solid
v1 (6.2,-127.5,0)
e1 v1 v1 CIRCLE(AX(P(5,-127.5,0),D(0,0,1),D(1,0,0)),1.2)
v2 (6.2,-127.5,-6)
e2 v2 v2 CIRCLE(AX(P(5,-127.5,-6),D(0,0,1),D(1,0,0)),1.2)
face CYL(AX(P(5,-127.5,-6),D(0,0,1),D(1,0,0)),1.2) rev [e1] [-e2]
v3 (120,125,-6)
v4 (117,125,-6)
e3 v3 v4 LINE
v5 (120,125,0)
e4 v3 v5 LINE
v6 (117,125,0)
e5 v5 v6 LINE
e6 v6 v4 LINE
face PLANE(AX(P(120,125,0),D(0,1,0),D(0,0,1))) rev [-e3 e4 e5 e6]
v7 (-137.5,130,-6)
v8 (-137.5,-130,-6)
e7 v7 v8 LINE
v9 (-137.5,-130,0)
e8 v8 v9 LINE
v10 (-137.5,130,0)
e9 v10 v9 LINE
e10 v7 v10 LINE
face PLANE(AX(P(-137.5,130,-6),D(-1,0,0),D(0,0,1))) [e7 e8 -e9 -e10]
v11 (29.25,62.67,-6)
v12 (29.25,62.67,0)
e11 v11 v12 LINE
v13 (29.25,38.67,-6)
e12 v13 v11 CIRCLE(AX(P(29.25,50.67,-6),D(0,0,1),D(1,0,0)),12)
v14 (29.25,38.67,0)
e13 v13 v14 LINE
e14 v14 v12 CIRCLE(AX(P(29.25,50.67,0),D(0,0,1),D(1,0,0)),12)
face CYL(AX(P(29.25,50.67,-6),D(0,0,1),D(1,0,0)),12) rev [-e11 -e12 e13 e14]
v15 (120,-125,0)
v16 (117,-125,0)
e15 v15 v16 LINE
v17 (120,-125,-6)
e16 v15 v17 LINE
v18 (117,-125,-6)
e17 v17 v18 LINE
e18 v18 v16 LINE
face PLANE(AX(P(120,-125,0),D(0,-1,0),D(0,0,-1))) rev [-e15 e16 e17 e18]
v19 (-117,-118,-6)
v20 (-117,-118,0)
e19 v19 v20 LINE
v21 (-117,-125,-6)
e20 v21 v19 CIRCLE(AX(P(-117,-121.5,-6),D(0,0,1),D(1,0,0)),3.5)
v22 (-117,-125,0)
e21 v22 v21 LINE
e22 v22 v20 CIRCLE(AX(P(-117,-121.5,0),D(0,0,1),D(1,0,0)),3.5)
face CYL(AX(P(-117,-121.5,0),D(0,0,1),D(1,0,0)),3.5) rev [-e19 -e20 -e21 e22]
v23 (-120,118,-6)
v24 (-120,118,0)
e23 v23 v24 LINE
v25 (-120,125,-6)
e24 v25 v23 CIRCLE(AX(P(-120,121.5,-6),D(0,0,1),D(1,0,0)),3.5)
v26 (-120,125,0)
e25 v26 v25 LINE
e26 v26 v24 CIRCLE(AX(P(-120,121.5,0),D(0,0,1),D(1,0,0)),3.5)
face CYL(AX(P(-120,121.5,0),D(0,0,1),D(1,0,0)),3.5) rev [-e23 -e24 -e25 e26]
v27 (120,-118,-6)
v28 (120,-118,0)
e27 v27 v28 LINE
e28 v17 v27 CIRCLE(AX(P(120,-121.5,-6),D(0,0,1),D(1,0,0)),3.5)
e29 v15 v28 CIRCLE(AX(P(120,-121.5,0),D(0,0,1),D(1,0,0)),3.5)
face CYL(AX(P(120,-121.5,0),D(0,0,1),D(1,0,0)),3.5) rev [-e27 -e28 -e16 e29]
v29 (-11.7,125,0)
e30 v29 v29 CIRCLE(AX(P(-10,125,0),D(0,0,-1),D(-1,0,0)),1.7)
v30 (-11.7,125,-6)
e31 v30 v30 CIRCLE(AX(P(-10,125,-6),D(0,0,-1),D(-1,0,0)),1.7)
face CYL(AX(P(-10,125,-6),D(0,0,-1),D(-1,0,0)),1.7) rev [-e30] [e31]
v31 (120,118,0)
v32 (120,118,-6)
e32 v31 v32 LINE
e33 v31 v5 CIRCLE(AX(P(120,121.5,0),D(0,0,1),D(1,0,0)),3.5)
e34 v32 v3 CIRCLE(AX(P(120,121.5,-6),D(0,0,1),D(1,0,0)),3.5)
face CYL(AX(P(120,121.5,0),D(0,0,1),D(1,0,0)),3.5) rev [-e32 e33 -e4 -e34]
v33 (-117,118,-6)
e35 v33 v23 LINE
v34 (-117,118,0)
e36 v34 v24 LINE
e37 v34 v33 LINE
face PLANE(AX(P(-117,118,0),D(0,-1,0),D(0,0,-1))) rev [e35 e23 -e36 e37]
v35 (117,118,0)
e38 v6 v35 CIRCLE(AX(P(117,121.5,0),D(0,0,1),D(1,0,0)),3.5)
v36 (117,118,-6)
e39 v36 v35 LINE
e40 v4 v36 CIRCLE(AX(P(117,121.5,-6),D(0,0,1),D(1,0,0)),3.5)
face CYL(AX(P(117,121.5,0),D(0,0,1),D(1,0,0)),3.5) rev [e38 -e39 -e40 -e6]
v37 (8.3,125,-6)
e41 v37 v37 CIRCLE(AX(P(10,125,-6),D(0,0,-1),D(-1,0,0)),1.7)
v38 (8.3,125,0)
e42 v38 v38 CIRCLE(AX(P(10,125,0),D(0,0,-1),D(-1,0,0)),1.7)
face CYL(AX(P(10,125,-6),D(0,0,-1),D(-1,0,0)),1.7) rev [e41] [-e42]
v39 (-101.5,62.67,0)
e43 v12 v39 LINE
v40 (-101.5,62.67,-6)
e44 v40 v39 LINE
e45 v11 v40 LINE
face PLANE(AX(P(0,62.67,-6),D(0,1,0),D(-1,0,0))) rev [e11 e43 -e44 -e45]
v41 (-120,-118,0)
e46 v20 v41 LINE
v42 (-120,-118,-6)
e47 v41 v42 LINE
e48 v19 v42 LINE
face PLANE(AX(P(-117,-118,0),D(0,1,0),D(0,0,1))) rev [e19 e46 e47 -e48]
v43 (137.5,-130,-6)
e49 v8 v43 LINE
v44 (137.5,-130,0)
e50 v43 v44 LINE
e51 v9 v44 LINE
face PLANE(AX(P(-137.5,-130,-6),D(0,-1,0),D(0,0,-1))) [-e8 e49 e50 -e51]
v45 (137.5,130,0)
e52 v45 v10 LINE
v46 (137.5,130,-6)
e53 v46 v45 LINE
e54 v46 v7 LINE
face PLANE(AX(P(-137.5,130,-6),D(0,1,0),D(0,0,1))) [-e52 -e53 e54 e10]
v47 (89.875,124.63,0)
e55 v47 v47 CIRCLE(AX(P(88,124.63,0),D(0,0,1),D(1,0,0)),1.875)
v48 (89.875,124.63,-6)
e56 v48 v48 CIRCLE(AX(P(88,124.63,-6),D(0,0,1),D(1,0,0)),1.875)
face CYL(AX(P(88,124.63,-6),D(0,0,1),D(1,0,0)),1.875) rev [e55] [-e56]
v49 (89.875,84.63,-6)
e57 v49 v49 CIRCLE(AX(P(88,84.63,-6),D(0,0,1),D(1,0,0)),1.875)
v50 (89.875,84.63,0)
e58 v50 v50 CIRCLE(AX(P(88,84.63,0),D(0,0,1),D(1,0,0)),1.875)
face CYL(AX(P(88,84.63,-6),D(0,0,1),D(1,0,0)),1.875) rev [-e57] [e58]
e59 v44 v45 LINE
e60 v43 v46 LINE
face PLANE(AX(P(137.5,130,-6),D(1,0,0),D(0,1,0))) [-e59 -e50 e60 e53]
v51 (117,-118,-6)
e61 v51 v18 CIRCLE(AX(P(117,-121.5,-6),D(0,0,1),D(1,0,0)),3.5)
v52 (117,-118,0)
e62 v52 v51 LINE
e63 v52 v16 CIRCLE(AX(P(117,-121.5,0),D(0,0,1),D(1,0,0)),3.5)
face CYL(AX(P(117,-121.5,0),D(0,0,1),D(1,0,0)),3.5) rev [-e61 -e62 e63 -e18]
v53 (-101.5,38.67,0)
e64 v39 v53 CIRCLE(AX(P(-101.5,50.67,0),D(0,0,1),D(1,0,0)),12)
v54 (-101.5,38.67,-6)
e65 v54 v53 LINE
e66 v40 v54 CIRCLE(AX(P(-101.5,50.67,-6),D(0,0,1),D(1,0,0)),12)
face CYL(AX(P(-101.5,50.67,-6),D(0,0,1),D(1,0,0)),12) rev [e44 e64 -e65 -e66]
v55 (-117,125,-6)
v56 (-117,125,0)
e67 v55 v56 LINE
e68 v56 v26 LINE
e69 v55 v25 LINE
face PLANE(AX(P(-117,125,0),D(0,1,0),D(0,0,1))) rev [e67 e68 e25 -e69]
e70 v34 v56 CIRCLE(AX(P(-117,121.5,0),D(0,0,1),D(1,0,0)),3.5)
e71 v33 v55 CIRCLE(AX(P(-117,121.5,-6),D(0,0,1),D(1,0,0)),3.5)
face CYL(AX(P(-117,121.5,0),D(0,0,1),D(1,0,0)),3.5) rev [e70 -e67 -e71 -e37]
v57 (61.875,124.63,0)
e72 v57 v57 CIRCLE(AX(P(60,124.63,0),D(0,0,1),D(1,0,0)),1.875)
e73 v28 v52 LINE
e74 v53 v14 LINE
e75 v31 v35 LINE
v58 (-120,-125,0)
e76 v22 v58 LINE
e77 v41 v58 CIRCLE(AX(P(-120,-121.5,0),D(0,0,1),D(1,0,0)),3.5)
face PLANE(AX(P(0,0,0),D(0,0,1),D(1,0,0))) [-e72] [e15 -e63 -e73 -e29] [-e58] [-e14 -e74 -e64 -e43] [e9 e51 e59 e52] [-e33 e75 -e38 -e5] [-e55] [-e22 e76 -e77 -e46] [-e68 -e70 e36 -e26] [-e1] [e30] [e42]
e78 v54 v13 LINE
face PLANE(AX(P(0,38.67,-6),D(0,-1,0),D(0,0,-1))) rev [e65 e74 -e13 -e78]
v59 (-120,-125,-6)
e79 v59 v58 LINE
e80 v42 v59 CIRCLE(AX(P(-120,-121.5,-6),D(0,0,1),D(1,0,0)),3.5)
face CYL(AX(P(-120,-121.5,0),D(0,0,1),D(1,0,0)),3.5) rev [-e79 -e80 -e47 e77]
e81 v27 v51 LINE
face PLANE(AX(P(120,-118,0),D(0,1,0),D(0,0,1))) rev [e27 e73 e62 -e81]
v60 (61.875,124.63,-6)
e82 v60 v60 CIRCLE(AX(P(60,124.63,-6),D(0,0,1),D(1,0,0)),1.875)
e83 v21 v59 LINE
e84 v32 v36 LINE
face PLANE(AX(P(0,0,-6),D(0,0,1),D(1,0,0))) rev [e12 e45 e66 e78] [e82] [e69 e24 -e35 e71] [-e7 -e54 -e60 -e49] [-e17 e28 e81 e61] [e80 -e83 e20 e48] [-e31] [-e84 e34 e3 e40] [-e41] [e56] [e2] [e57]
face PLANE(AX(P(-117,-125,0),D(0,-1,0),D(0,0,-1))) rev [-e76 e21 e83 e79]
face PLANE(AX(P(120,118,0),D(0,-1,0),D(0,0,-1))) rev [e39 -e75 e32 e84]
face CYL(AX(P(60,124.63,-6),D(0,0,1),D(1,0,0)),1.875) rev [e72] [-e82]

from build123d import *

# Parameters (mm, degrees)
CROQUIS1_W                      = 275
CROQUIS1_H                      = 260
BRIDA_BASE1_DEPTH               = 6
CORTAR_EXTRUIR1_DEPTH           = 190.320495457
CORTAR_EXTRUIR2_DEPTH           = 190.320495457
CORTAR_EXTRUIR2_DEPTH_BACK      = 190.320495457
CROQUIS3_R                      = 1.875
RANURA_START                    = -6
RANURA_DE_MARGEN_PARA_M61_DEPTH = 6
CROQUIS8_R                      = 1.2
CORTAR_EXTRUIR4_DEPTH           = 190.320495457
TALADRO_DE_MARGEN_PARA_M31_D    = 3.4


# Read off the part's stored shape, not the designer's step: Ranura de margen para M61
# Sheet-metal steps are written as plain solids
with BuildPart() as part:
    # Croquis1 → Brida base1 (new body)
    with BuildSketch(Plane.XY):
        Rectangle(CROQUIS1_W, CROQUIS1_H)
    extrude(amount=-BRIDA_BASE1_DEPTH)

    # Croquis2 → Cortar-Extruir1 (cut, through all)
    with BuildSketch(Plane.XY):
        with BuildLine():
            Line((-101.5, 38.67), (29.25, 38.67))
            ThreePointArc((29.25, 38.67), (41.25, 50.67), (29.25, 62.67))
            Line((29.25, 62.67), (-101.5, 62.67))
            ThreePointArc((-101.5, 62.67), (-113.5, 50.67), (-101.5, 38.67))
        make_face()
    extrude(amount=-CORTAR_EXTRUIR1_DEPTH, mode=Mode.SUBTRACT)

    # Croquis3 → Cortar-Extruir2 (cut, two sides: drawn at the far end of the back side and taken through both)
    with BuildSketch(Plane.XY.offset(-CORTAR_EXTRUIR2_DEPTH_BACK)):
        with Locations((88, 84.63)):
            Circle(CROQUIS3_R)
        with Locations((88, 124.63)):
            Circle(CROQUIS3_R)
        with Locations((60, 124.63)):
            Circle(CROQUIS3_R)
    extrude(amount=CORTAR_EXTRUIR2_DEPTH + CORTAR_EXTRUIR2_DEPTH_BACK, mode=Mode.SUBTRACT)

    # Ranura de margen para M61 outline → Ranura de margen para M61 (cut)
    with BuildSketch(Plane.XY.offset(RANURA_START)):
        with BuildLine():
            Line((120, 125), (117, 125))
            ThreePointArc((117, 125), (113.5, 121.5), (117, 118))
            Line((117, 118), (120, 118))
            ThreePointArc((120, 118), (123.5, 121.5), (120, 125))
        make_face()
        with BuildLine():
            ThreePointArc((-120, 125), (-123.5, 121.5), (-120, 118))
            Line((-120, 118), (-117, 118))
            ThreePointArc((-117, 118), (-113.5, 121.5), (-117, 125))
            Line((-117, 125), (-120, 125))
        make_face()
        with BuildLine():
            Line((-117, -118), (-120, -118))
            ThreePointArc((-120, -118), (-123.5, -121.5), (-120, -125))
            Line((-120, -125), (-117, -125))
            ThreePointArc((-117, -125), (-113.5, -121.5), (-117, -118))
        make_face()
        with BuildLine():
            ThreePointArc((117, -118), (113.5, -121.5), (117, -125))
            Line((117, -125), (120, -125))
            ThreePointArc((120, -125), (123.5, -121.5), (120, -118))
            Line((120, -118), (117, -118))
        make_face()
    extrude(amount=RANURA_DE_MARGEN_PARA_M61_DEPTH, mode=Mode.SUBTRACT)

    # Croquis8 → Cortar-Extruir4 (cut, through all)
    with BuildSketch(Plane.XY):
        with Locations((5, -127.5)):
            Circle(CROQUIS8_R)
    extrude(amount=-CORTAR_EXTRUIR4_DEPTH, mode=Mode.SUBTRACT)

    # Taladro de margen para M31 (through all)
    with Locations(Plane(origin=(0, 0, -6), x_dir=(-1, 0, 0), z_dir=(0, 0, -1))):
        with Locations((10, 125), (-10, 125)):
            Hole(TALADRO_DE_MARGEN_PARA_M31_D / 2)


solid = part.part
